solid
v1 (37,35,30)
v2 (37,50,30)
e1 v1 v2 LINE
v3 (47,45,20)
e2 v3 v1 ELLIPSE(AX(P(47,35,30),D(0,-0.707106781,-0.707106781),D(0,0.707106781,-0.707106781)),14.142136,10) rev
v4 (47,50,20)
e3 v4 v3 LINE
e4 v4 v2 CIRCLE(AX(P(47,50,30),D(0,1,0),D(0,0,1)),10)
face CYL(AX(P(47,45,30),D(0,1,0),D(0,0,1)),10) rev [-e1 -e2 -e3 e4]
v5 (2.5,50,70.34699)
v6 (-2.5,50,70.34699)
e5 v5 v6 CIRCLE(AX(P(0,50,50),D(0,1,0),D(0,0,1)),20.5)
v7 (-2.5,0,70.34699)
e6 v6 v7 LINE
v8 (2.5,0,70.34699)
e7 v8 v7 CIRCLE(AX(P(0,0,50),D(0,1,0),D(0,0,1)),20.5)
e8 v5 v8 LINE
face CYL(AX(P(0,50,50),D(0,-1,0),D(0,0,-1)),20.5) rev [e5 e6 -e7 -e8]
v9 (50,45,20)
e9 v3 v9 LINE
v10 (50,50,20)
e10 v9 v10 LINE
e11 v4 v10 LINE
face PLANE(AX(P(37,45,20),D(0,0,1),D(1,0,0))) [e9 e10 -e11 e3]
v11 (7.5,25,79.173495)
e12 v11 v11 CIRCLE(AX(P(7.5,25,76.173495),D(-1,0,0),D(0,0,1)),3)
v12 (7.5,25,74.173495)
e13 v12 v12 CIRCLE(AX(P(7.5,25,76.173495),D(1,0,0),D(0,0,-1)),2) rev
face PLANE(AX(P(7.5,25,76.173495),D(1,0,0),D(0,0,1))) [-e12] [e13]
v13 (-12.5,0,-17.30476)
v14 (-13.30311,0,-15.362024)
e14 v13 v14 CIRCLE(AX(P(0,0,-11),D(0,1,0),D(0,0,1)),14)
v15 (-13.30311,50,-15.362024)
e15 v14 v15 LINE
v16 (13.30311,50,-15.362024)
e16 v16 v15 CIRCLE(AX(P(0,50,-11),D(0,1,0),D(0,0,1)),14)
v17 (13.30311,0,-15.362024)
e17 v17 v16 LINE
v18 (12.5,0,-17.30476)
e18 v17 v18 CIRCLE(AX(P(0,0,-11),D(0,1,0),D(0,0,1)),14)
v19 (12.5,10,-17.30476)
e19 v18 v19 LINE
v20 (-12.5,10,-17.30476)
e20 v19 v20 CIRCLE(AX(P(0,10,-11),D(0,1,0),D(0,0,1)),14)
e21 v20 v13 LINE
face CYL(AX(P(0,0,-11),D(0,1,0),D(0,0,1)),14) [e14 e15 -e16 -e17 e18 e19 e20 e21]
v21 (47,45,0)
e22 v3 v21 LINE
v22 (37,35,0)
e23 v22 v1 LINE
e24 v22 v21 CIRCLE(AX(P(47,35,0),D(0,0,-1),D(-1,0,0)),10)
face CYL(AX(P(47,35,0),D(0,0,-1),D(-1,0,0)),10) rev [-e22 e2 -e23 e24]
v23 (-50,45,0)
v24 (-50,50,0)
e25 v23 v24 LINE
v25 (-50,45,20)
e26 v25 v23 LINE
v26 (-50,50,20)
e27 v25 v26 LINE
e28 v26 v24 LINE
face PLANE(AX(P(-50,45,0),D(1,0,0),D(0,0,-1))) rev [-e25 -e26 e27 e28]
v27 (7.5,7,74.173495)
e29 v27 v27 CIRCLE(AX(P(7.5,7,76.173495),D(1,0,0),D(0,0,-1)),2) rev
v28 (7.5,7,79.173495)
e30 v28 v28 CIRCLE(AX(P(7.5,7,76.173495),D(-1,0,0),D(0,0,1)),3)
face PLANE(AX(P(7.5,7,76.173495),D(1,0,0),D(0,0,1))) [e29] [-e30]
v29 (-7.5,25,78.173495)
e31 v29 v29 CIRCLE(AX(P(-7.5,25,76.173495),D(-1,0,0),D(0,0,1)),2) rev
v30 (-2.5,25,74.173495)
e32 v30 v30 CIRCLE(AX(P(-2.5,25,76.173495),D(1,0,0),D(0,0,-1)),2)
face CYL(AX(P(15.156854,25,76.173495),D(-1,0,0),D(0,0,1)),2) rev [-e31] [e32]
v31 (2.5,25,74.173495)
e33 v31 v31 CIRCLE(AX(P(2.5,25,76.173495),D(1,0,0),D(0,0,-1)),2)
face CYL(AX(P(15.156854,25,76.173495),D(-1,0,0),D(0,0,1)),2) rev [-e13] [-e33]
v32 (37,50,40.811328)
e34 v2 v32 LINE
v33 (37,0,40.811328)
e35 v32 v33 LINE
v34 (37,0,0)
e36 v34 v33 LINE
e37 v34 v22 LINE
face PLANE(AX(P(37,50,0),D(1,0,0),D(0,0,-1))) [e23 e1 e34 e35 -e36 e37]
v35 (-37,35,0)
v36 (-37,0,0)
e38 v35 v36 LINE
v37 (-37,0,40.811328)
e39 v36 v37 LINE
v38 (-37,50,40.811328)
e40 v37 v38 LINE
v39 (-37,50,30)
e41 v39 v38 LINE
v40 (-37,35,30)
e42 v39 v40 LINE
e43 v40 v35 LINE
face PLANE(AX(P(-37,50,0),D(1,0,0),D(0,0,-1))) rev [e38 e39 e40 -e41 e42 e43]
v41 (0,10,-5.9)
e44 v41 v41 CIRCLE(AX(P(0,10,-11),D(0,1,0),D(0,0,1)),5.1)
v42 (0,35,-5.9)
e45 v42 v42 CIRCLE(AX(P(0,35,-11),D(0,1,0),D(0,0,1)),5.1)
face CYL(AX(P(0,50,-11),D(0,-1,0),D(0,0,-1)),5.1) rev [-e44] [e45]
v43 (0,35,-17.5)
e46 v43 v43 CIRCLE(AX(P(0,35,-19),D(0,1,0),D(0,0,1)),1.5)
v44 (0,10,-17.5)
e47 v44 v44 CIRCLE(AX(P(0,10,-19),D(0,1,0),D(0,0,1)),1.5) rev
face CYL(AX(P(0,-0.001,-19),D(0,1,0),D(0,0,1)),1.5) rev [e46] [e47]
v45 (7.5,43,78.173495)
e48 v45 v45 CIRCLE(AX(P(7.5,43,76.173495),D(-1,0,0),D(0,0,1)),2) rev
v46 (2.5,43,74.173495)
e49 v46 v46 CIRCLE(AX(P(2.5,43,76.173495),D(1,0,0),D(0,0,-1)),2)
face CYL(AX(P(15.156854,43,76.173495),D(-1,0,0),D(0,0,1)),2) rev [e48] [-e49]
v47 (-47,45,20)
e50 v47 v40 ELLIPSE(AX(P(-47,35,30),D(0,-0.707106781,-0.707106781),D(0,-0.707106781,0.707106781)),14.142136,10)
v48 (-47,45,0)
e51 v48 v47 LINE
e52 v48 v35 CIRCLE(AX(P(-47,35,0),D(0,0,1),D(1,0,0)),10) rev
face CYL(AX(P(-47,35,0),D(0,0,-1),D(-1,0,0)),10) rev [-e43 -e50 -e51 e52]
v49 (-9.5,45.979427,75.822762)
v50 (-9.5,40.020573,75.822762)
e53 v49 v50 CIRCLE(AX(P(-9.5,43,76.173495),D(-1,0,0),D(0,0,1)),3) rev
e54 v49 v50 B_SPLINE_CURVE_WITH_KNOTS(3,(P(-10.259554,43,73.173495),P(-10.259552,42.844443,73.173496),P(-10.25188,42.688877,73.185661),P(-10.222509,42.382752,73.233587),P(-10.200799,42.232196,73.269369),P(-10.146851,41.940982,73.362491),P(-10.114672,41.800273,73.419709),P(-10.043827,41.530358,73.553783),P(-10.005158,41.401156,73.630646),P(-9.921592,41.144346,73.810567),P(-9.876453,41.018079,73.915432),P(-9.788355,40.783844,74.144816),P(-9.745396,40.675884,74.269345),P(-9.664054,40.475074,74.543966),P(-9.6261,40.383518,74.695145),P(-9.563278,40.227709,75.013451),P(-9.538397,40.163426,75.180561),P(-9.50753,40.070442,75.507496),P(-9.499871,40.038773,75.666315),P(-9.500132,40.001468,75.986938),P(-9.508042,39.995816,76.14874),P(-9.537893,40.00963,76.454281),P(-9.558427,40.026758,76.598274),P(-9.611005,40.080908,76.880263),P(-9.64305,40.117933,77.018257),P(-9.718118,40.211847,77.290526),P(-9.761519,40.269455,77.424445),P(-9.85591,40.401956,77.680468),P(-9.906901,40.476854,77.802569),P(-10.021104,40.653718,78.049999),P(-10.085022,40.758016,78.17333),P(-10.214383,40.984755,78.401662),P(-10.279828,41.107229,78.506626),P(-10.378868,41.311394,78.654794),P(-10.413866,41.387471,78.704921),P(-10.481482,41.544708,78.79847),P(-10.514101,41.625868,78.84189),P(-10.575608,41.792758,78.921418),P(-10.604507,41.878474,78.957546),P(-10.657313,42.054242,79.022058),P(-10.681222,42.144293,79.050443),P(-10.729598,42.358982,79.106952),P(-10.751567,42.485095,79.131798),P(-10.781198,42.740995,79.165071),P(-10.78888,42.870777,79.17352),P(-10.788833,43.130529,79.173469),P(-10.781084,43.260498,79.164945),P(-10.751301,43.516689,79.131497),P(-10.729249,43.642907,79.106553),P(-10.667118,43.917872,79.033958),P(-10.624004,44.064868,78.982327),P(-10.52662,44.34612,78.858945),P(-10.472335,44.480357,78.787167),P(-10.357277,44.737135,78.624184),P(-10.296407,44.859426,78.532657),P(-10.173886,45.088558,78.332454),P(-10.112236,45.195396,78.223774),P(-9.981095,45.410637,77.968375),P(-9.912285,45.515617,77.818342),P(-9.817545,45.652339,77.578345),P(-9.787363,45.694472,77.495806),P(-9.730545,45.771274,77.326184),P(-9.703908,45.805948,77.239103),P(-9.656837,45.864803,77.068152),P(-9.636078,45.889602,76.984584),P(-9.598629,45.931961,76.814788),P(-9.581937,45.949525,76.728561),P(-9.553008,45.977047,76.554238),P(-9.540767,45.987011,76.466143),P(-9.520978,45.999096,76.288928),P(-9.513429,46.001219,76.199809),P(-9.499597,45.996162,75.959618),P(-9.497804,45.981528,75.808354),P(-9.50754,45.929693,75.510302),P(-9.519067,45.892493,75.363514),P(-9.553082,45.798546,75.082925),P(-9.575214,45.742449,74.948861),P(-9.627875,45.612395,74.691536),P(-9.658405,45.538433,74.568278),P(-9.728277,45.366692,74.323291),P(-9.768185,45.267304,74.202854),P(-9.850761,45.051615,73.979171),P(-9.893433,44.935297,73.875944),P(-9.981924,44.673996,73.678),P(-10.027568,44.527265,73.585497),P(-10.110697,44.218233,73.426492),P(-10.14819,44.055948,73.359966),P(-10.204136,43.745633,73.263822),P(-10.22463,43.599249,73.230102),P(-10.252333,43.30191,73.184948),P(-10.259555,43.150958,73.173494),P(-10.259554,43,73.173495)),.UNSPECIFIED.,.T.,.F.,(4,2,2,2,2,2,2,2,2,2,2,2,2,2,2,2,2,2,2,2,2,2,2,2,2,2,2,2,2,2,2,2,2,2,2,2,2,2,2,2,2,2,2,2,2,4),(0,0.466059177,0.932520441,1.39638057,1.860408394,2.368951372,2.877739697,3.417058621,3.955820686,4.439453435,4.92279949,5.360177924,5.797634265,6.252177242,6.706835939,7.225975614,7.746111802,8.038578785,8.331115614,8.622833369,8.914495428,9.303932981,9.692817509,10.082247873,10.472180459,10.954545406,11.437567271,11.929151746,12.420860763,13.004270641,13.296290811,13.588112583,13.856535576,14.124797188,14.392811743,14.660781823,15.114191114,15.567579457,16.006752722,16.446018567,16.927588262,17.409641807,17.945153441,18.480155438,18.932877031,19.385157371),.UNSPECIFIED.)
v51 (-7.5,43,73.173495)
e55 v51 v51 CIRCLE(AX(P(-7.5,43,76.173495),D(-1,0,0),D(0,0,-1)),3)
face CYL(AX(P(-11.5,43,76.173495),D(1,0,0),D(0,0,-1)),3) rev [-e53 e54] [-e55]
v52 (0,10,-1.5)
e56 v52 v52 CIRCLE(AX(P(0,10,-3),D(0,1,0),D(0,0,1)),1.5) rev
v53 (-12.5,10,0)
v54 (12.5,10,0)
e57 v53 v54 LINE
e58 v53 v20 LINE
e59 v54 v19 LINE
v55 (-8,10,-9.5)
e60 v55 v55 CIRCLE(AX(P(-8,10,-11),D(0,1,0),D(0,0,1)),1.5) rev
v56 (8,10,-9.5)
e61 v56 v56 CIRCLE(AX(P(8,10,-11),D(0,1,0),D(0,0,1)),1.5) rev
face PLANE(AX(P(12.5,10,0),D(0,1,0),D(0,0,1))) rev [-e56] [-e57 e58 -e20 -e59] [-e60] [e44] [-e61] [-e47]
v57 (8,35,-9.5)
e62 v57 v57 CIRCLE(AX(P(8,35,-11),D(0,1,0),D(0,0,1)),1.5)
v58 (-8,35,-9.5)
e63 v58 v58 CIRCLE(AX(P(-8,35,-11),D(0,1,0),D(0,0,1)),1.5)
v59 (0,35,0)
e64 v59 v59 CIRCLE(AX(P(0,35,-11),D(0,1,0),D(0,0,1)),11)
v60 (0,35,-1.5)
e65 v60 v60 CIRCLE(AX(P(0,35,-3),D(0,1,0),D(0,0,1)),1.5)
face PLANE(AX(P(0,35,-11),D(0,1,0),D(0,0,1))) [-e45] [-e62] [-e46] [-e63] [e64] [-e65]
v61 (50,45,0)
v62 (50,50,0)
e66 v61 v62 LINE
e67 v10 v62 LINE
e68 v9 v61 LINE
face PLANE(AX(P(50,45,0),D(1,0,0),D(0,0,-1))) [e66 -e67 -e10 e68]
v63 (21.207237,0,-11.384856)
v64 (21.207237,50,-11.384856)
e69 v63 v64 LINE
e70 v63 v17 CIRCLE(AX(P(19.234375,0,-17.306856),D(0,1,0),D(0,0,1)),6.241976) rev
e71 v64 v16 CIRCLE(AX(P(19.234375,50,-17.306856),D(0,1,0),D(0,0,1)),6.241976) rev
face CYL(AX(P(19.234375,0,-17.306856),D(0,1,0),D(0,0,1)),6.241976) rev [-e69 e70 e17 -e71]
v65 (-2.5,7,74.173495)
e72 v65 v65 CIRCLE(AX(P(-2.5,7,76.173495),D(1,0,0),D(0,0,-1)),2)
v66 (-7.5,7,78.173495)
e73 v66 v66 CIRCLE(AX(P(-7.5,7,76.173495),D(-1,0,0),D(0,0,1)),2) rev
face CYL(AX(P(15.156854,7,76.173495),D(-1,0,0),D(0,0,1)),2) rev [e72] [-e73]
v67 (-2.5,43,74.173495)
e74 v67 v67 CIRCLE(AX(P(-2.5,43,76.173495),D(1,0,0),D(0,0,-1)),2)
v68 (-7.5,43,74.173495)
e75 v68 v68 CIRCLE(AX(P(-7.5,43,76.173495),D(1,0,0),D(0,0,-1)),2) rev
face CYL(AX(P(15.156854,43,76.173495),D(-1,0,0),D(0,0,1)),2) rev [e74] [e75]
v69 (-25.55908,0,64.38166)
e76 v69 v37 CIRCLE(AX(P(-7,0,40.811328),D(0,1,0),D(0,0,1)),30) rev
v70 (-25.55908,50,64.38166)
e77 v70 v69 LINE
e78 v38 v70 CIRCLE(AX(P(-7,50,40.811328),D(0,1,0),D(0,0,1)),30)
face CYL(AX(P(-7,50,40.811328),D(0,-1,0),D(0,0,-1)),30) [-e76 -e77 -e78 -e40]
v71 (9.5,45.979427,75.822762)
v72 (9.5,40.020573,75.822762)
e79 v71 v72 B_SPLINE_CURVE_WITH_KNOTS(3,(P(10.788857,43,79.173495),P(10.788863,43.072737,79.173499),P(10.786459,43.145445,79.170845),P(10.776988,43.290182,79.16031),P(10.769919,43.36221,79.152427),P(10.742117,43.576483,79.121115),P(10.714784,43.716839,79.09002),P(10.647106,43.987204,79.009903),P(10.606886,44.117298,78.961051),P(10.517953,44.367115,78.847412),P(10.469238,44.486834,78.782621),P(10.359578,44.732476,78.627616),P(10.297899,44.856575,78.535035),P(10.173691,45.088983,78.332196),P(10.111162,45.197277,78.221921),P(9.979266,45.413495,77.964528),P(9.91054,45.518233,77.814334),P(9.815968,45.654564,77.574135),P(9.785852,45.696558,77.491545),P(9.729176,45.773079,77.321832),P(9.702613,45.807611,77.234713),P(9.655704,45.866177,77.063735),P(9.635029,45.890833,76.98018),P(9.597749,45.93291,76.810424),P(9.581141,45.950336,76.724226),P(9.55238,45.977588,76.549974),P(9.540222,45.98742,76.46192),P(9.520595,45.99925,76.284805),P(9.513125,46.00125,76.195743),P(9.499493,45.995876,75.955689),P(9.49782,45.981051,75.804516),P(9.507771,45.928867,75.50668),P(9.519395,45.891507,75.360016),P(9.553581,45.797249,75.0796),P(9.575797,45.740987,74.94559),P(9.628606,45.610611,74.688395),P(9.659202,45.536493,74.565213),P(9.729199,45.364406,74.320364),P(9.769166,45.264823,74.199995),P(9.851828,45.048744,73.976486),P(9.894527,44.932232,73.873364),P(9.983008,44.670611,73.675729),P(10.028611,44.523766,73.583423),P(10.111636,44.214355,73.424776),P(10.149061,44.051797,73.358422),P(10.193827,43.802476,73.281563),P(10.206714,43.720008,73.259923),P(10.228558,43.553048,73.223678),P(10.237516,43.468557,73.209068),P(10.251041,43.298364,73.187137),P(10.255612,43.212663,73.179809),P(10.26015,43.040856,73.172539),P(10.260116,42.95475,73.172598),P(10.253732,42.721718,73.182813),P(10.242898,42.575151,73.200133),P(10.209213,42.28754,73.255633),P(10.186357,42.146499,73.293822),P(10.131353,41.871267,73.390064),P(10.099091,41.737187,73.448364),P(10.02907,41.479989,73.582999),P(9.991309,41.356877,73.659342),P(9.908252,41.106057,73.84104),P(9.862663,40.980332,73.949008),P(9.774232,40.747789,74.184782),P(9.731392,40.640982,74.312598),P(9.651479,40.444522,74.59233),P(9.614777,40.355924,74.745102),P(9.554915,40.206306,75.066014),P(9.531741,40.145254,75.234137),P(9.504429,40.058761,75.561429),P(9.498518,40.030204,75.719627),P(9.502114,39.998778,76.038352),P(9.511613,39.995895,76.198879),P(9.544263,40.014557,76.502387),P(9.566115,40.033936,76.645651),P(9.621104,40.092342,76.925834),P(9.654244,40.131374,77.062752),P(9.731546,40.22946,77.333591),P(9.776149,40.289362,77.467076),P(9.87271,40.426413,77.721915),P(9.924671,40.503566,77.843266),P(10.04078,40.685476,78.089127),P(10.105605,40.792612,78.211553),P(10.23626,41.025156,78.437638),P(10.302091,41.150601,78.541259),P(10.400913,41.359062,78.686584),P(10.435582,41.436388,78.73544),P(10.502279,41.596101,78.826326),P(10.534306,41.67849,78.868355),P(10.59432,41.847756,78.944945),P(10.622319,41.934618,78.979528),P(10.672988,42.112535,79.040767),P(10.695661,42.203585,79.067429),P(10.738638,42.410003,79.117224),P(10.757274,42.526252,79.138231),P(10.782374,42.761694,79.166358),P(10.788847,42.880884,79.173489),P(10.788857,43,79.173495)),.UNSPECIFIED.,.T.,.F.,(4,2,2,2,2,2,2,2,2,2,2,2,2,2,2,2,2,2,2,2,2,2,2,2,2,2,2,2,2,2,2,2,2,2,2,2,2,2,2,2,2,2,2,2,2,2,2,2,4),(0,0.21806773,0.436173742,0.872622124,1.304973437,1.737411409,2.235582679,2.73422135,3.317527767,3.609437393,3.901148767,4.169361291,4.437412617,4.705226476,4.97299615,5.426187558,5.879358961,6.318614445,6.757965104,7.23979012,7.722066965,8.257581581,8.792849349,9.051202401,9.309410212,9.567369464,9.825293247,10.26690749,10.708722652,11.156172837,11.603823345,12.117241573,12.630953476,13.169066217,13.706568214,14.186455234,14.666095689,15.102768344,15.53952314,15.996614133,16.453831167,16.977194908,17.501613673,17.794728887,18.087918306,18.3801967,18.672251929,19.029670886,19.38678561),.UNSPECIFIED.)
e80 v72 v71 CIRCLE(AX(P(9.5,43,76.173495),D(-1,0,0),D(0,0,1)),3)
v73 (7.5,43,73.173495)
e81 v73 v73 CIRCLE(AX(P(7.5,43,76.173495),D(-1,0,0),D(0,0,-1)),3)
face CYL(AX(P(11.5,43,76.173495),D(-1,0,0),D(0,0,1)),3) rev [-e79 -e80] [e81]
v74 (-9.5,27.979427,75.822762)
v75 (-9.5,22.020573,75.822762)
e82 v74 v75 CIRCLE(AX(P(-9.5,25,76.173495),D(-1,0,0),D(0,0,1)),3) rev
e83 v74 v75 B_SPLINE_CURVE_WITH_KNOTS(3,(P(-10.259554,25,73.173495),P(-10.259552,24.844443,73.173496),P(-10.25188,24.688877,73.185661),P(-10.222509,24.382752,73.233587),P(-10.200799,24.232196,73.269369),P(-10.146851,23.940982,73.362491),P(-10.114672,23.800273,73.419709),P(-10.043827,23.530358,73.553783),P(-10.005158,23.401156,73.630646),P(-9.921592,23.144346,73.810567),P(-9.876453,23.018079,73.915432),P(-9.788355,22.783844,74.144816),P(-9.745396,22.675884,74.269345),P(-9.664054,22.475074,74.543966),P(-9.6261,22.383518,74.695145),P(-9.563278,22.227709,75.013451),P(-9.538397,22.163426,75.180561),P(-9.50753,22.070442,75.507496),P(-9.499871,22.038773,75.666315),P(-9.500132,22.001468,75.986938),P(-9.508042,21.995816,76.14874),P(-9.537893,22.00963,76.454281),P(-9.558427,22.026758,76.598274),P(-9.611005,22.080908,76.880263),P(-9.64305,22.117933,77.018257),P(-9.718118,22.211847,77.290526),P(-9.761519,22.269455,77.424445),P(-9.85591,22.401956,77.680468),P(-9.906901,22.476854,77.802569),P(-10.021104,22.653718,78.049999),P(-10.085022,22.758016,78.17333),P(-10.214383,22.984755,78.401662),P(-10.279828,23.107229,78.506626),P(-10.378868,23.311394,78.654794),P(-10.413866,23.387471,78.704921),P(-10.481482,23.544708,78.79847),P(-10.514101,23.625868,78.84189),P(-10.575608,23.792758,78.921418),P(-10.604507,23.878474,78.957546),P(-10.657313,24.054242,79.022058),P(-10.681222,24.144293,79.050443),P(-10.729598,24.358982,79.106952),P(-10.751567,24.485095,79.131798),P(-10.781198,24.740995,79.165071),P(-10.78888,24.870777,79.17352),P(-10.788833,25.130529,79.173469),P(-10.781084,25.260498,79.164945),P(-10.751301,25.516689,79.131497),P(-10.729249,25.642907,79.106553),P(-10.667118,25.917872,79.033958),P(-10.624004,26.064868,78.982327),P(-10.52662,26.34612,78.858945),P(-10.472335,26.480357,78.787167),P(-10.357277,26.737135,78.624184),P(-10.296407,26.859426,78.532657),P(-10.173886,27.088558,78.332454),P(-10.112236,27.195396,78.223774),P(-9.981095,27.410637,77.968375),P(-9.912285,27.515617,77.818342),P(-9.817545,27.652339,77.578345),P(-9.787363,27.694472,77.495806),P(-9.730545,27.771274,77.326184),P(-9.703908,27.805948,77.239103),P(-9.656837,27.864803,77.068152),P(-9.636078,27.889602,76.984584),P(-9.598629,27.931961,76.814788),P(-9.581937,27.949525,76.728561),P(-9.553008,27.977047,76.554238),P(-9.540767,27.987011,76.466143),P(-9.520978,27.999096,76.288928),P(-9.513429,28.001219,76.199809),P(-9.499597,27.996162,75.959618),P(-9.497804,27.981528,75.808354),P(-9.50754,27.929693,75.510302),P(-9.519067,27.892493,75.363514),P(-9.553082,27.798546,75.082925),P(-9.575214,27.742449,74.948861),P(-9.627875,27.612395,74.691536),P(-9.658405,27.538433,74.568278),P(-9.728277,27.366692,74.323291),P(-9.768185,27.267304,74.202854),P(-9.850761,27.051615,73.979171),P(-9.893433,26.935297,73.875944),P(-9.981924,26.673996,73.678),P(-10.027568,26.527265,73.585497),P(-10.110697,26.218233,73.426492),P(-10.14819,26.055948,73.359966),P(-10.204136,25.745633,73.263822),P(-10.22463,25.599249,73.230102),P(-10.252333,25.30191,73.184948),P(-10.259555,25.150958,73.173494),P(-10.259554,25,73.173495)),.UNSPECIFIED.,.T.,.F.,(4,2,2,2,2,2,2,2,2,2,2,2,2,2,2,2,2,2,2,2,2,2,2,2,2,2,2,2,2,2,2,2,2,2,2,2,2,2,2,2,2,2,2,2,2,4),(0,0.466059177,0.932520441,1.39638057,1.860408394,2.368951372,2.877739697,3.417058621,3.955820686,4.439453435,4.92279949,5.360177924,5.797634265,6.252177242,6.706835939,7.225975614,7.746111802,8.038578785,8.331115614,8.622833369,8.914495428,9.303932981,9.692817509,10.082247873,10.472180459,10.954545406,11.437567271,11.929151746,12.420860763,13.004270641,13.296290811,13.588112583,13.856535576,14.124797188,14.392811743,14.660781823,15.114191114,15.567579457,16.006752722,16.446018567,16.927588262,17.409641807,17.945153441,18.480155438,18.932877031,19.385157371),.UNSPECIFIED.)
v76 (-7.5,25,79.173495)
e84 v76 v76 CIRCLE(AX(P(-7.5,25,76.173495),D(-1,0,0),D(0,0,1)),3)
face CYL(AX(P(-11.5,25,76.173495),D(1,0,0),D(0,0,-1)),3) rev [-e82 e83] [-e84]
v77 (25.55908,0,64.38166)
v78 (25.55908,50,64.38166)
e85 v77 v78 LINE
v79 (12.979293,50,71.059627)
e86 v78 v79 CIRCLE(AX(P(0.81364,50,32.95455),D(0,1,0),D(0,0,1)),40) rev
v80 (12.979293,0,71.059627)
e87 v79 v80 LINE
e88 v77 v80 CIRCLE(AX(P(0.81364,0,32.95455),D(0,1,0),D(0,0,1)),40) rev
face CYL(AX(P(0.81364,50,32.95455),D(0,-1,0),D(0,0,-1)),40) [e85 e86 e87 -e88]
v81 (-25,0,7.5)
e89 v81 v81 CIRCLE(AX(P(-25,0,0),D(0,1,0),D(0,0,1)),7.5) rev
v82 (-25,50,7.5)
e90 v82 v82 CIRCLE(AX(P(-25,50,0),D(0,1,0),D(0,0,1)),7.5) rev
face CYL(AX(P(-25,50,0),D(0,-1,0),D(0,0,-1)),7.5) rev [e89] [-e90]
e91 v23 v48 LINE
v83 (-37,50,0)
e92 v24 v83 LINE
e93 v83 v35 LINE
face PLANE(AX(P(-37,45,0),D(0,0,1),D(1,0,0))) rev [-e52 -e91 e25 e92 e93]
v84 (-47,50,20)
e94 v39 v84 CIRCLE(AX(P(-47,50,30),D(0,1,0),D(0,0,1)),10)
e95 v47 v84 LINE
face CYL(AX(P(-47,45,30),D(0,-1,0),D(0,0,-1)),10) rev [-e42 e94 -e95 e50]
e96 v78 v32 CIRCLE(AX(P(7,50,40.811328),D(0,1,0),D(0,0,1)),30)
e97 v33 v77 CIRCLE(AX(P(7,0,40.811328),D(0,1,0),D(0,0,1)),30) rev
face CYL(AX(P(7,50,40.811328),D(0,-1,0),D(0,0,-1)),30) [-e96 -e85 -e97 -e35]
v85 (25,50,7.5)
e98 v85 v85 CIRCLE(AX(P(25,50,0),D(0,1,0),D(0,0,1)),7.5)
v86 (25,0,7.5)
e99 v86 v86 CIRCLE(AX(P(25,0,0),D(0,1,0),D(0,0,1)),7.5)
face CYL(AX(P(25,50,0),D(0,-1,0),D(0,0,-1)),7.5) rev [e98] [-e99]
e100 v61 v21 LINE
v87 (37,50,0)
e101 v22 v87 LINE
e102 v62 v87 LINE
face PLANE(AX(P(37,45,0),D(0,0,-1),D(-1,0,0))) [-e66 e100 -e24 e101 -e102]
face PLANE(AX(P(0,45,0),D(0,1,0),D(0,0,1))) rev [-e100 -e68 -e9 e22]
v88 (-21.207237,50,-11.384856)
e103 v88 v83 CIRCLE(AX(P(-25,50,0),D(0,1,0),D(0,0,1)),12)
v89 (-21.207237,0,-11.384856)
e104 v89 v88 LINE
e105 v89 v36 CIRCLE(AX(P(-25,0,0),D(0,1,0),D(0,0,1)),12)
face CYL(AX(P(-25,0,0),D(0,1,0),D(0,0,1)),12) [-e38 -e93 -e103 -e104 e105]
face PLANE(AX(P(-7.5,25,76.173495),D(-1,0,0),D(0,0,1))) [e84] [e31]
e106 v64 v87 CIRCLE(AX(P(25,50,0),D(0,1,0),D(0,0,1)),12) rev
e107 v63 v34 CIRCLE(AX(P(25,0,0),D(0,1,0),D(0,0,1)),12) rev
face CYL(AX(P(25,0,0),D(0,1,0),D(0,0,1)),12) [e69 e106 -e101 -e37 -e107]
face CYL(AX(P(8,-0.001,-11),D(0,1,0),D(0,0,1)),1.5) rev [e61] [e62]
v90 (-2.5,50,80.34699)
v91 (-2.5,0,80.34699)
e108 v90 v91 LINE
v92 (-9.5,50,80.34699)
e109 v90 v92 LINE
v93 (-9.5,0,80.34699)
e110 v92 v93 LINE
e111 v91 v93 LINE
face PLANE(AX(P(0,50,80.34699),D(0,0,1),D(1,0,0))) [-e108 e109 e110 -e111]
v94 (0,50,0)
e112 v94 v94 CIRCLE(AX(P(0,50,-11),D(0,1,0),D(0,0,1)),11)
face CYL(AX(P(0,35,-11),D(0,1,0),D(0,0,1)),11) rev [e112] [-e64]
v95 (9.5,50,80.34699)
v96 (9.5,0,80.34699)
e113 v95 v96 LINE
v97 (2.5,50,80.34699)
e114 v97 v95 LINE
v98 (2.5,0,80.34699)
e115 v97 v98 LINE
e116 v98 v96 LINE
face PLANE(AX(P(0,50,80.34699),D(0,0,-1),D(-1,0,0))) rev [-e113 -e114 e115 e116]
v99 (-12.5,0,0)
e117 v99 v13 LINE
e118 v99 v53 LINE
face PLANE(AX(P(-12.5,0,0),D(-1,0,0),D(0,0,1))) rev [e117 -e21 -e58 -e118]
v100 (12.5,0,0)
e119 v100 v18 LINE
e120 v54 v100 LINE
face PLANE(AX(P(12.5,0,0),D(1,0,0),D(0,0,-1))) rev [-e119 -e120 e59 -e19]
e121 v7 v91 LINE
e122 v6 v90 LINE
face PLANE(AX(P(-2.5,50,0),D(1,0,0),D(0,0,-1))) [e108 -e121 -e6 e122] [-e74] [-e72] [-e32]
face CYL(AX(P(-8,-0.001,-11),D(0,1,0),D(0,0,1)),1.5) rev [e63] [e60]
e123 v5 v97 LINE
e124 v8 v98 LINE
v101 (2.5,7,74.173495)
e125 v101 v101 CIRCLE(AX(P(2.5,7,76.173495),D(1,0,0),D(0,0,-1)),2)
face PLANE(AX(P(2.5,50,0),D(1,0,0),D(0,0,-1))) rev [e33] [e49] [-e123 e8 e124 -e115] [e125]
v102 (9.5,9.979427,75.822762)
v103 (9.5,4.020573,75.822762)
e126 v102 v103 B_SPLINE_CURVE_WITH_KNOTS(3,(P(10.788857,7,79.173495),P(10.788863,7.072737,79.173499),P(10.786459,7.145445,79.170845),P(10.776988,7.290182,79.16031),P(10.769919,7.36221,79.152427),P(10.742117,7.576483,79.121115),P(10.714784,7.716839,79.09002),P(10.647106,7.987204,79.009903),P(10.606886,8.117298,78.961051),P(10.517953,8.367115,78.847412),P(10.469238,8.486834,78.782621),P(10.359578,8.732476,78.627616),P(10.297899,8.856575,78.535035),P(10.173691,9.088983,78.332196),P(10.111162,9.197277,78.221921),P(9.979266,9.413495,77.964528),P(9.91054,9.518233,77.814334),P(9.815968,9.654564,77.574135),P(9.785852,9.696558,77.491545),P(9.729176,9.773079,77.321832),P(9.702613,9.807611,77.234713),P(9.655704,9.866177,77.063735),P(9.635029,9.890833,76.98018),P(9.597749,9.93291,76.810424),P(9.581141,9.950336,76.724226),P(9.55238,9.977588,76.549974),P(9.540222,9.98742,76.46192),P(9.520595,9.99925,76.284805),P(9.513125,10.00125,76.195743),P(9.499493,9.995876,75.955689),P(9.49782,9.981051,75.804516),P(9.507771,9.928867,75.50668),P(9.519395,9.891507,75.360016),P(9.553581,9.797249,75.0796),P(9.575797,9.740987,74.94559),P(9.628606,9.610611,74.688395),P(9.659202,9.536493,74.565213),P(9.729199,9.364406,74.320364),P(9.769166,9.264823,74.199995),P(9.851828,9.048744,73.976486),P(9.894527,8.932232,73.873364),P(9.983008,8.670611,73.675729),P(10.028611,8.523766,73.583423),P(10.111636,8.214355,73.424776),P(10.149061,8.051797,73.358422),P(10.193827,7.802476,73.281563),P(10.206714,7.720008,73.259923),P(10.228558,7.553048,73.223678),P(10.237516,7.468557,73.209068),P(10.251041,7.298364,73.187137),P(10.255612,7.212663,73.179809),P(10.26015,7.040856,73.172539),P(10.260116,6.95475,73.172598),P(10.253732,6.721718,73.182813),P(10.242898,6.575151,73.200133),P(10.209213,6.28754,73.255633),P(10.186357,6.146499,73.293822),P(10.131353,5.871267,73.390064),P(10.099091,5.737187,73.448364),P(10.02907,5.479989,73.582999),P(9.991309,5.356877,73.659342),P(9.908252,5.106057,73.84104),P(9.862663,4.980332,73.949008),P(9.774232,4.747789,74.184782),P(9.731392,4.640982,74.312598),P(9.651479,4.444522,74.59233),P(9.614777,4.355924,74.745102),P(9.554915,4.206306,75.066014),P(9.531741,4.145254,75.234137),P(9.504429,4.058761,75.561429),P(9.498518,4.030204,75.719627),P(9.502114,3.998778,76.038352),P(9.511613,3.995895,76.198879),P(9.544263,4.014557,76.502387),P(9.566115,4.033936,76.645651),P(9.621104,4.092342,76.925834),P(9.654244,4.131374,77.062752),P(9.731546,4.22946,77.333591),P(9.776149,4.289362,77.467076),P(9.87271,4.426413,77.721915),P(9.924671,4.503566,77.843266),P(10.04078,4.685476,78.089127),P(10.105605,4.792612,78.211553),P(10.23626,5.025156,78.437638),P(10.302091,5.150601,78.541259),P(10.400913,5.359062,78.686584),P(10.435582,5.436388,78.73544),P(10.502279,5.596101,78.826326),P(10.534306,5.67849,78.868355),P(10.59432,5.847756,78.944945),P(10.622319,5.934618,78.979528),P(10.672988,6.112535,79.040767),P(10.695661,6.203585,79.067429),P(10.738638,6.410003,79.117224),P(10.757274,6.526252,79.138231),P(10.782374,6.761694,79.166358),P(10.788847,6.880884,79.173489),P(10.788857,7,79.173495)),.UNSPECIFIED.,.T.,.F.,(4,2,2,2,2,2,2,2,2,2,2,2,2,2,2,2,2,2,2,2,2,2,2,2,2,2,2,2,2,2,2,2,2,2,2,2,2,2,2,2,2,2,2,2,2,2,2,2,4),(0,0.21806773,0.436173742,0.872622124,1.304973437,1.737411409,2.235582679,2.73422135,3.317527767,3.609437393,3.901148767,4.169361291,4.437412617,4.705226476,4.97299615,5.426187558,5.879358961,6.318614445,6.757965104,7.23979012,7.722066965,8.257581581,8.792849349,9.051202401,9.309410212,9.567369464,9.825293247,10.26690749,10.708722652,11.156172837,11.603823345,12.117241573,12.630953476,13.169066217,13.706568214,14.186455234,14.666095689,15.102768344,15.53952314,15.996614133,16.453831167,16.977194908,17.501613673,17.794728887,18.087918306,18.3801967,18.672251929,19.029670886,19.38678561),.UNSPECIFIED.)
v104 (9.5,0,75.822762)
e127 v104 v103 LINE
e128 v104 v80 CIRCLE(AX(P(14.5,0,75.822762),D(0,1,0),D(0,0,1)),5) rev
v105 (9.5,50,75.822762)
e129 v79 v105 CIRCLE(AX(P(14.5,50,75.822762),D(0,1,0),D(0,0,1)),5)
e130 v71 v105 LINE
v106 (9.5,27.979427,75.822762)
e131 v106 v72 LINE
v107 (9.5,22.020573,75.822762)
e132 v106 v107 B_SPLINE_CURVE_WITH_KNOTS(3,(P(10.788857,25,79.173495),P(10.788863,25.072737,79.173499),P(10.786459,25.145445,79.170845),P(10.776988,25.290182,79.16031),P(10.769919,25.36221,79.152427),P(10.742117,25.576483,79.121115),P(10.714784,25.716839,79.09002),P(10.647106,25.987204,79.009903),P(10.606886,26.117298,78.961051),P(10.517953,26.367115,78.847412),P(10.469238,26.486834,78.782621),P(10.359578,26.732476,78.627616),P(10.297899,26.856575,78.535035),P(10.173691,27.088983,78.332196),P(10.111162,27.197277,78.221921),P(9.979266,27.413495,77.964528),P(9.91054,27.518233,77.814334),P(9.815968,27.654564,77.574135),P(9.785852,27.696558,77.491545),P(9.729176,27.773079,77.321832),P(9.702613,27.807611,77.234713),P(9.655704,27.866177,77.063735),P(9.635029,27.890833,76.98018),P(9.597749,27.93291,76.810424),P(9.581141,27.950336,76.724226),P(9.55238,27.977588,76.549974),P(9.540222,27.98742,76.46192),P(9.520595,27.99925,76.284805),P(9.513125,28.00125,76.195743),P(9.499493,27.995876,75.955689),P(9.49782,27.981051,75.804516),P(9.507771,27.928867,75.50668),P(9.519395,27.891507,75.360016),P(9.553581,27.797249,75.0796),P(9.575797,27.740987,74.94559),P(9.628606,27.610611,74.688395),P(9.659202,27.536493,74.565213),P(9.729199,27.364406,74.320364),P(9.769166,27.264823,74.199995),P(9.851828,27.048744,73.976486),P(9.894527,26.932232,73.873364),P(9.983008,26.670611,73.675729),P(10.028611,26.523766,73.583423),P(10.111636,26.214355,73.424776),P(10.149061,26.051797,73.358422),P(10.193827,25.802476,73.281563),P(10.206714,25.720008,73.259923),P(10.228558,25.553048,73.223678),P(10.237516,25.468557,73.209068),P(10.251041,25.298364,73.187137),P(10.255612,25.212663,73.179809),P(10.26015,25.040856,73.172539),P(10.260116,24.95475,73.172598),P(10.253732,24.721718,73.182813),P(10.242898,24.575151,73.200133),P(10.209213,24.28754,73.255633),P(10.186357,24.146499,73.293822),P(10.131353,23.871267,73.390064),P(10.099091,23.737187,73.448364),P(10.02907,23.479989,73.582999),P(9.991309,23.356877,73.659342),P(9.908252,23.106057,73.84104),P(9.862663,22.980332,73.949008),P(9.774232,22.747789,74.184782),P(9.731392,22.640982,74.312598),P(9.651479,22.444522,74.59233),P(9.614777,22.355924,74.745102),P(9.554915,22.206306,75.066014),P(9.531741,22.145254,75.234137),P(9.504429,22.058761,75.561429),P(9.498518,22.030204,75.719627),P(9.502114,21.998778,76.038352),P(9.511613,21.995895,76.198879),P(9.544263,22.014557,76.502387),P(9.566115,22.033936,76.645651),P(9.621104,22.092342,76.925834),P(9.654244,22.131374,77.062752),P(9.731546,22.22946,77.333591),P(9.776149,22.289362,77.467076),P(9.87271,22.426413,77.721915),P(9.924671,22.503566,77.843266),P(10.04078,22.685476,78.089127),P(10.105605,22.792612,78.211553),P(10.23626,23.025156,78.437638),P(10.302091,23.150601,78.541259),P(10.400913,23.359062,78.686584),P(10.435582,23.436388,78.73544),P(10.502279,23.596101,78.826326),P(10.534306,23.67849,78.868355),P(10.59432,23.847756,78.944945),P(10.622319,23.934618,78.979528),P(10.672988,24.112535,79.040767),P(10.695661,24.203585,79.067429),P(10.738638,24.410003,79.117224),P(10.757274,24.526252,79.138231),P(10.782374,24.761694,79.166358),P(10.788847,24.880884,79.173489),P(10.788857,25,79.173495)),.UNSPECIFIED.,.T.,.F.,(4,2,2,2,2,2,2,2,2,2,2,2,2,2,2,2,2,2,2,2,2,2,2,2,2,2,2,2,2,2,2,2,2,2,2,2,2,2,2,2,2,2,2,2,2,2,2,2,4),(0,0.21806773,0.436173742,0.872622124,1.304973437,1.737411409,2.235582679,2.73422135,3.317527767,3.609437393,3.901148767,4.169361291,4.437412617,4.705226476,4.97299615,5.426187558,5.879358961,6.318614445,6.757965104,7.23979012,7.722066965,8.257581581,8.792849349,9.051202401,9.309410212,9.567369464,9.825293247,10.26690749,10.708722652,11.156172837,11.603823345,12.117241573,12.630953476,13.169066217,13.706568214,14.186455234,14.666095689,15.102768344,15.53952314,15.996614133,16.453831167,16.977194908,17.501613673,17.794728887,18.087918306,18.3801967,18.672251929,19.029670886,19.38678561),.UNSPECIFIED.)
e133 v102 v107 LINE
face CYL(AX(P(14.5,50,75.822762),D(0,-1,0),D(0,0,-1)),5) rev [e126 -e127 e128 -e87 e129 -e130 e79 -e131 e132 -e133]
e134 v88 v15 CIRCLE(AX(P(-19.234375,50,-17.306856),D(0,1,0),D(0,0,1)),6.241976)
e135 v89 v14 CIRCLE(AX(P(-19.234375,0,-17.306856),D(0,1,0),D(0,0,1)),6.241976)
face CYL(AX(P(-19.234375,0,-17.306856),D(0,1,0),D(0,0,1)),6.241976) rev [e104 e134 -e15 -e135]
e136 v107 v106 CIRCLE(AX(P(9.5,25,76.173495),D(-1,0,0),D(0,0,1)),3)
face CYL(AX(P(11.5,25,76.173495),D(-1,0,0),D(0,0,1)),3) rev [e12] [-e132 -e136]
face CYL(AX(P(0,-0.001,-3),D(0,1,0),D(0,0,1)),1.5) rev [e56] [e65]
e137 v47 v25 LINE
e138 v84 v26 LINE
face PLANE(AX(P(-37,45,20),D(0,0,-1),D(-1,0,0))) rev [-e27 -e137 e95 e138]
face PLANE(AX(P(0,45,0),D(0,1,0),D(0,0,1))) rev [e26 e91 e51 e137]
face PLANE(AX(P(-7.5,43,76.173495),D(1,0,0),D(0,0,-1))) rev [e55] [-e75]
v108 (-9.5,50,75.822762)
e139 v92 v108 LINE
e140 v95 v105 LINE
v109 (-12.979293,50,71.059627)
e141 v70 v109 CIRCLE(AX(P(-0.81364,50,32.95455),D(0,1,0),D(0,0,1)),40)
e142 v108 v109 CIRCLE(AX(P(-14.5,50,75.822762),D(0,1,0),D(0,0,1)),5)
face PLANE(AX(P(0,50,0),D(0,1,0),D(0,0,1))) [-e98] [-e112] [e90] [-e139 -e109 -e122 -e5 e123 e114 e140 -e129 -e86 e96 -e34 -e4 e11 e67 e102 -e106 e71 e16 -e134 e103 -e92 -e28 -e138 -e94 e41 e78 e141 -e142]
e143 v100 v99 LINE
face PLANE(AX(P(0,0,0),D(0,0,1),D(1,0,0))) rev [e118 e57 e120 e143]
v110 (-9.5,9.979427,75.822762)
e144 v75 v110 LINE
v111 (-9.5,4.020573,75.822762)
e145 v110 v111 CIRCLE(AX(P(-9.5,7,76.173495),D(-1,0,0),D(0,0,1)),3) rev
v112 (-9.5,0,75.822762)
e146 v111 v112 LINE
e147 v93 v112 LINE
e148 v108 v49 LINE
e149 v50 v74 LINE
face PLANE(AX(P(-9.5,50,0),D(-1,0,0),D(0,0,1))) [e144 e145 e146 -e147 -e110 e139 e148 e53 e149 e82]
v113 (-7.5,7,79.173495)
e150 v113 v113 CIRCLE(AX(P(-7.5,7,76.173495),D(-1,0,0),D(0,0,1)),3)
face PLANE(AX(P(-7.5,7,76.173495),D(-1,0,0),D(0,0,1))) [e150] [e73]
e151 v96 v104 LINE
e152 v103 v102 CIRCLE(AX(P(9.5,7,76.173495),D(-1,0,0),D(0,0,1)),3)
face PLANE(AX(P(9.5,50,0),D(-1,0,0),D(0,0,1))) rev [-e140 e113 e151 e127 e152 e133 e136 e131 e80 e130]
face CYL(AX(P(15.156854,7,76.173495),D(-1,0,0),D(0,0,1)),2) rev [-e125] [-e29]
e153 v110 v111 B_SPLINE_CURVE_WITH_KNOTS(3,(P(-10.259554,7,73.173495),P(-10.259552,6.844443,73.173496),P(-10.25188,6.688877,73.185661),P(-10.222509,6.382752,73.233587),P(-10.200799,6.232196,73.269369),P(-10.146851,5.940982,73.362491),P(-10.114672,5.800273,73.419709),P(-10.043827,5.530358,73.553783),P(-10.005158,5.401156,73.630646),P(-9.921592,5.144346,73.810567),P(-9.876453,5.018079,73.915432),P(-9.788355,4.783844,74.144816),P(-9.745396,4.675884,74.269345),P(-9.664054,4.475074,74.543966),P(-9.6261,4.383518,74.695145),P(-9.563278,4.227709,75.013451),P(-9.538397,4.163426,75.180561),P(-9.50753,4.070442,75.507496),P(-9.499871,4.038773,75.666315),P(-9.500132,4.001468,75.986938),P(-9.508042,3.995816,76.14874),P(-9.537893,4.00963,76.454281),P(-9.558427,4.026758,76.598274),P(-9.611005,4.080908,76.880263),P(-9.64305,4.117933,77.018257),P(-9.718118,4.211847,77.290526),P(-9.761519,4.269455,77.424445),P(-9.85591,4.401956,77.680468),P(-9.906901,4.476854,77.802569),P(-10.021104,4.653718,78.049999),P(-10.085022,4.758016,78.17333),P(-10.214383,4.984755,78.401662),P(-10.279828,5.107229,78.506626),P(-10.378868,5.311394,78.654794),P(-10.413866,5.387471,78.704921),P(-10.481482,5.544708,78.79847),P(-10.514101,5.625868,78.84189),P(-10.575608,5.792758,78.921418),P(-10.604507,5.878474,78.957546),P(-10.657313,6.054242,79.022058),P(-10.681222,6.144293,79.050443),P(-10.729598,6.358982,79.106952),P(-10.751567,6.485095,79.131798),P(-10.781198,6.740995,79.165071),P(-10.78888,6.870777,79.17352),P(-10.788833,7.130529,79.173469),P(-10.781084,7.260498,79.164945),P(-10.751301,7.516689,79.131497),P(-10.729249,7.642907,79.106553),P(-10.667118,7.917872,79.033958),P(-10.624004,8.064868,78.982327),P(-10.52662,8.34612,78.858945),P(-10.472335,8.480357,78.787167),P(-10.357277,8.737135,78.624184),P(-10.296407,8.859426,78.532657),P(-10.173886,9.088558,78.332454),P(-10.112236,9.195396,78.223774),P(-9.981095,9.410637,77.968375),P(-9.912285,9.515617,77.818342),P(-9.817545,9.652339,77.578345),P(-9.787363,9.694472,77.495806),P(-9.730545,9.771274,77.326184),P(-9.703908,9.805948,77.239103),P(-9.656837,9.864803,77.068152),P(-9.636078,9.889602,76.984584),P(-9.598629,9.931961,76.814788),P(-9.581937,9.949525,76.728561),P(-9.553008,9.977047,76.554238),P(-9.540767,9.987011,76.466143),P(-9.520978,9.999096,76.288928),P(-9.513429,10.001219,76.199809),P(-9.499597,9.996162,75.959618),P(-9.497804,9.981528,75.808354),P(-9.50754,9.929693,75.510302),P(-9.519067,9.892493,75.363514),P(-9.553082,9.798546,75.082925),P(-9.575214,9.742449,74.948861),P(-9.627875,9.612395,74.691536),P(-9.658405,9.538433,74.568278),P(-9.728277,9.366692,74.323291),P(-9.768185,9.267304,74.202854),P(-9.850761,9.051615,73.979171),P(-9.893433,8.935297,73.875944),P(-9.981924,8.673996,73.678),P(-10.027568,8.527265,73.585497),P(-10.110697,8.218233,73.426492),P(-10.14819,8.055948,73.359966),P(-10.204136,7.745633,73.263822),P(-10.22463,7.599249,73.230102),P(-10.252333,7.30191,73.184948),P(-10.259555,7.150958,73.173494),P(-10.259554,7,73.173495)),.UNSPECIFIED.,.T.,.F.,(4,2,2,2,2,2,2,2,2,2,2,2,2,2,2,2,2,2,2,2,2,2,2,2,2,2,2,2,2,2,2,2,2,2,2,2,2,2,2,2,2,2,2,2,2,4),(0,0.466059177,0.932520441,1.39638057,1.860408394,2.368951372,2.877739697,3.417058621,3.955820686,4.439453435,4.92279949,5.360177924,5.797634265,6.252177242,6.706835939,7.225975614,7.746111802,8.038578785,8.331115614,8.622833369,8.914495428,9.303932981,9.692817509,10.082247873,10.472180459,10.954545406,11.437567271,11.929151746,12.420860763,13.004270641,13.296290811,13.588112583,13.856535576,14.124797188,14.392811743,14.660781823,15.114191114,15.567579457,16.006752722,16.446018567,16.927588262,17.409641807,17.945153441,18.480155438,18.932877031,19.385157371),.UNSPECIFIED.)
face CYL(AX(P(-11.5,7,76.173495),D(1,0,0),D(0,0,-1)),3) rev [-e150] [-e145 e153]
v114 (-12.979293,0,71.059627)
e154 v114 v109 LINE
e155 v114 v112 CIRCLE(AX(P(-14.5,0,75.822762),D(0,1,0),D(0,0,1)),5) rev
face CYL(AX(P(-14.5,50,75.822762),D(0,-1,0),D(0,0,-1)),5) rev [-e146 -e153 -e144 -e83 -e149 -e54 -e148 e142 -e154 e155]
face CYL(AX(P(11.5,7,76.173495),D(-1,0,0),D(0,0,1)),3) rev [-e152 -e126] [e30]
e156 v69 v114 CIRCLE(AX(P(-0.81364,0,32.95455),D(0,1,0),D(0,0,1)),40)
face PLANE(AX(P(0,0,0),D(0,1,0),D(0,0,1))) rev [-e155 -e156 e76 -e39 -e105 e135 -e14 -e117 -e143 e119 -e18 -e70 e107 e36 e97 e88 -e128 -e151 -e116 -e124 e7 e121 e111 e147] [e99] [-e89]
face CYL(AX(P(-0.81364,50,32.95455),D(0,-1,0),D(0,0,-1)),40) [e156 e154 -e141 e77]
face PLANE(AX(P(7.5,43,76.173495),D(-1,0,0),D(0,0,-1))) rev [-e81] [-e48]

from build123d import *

# Parameters (mm, degrees)
SKETCH1_R           = 7.5
SKETCH1_R_2         = 5.1
BOSS_EXTRUDE1_DEPTH = 50
SKETCH4_R           = 11
CUT_EXTRUDE1_DEPTH  = 15
CUT_EXTRUDE2_REACH  = 97.13
SKETCH5_R           = 1.5
SKETCH7_W           = 25
SKETCH7_H           = 10
CUT_EXTRUDE3_DEPTH  = 25
FILLET1_R           = 25
FILLET2_R           = 25
CUT_EXTRUDE4_REACH  = 107.441
SKETCH9_R           = 2
FILLET3_R           = 5
FILLET4_R           = 5
SKETCH10_R          = 3
CUT_EXTRUDE5_DEPTH  = 2
CUT_EXTRUDE6_DEPTH  = 102.610229819
FILLET5_R           = 30
FILLET6_R           = 30
SKETCH13_W          = 13
SKETCH13_H          = 20
BOSS_EXTRUDE2_DEPTH = 5
FILLET7_R           = 10
FILLET13_R          = 10


with BuildPart() as part:
    # Sketch1 → Boss-Extrude1 (new body)
    with BuildSketch(Plane(origin=(0, 0, 0), x_dir=(1, 0, 0), z_dir=(0, 1, 0))):
        with BuildLine():
            Line((2.5, -70.346989949), (2.5, -80.346989949))
            Line((2.5, -80.346989949), (9.5, -80.346989949))
            Line((9.5, -80.346989949), (9.5, -72))
            ThreePointArc((9.5, -72), (25.801442039, -64.189302549), (37, -50))
            Line((37, -50), (37, 25))
            Line((37, 25), (-37, 25))
            Line((-37, 25), (-37, -50))
            ThreePointArc((-37, -50), (-25.801442039, -64.189302549), (-9.5, -72))
            Line((-9.5, -72), (-9.5, -80.346989949))
            Line((-9.5, -80.346989949), (-2.5, -80.346989949))
            Line((-2.5, -80.346989949), (-2.5, -70.346989949))
            ThreePointArc((-2.5, -70.346989949), (0, -29.5), (2.5, -70.346989949))
        make_face()
        with Locations(Location((25, 0, 0), (0, 0, 270))):
            Circle(SKETCH1_R, mode=Mode.SUBTRACT)
        with Locations(Location((-25, 0, 0), (0, 0, 270))):
            Circle(SKETCH1_R, mode=Mode.SUBTRACT)
        with Locations(Location((0, 11, 0), (0, 0, 270))):
            Circle(SKETCH1_R_2, mode=Mode.SUBTRACT)
    extrude(amount=BOSS_EXTRUDE1_DEPTH)

    # Sketch4 → Cut-Extrude1 (cut)
    with BuildSketch(Plane(origin=(0, 50, 0), x_dir=(1, 0, 0), z_dir=(0, 1, 0))):
        with Locations(Location((0, 11, 0), (0, 0, 270))):
            Circle(SKETCH4_R)
    extrude(amount=-CUT_EXTRUDE1_DEPTH, mode=Mode.SUBTRACT)

    # Sketch5 → Cut-Extrude2 (cut, up to next)
    with BuildSketch(Plane(origin=(0, 35, 0), x_dir=(1, 0, 0), z_dir=(0, 1, 0)), mode=Mode.PRIVATE) as cut_extrude2_sk1:
        with Locations(Location((0, 19, 0), (0, 0, 270))):
            Circle(SKETCH5_R)
    cut_extrude2_tool1 = extrude(cut_extrude2_sk1.sketch, amount=-CUT_EXTRUDE2_REACH, mode=Mode.PRIVATE) & part.part
    # Sketch5 → Cut-Extrude2 (cut, up to next)
    with BuildSketch(Plane(origin=(0, 35, 0), x_dir=(1, 0, 0), z_dir=(0, 1, 0)), mode=Mode.PRIVATE) as cut_extrude2_sk2:
        with Locations(Location((8, 11, 0), (0, 0, 270))):
            Circle(SKETCH5_R)
    cut_extrude2_tool2 = extrude(cut_extrude2_sk2.sketch, amount=-CUT_EXTRUDE2_REACH, mode=Mode.PRIVATE) & part.part
    # Sketch5 → Cut-Extrude2 (cut, up to next)
    with BuildSketch(Plane(origin=(0, 35, 0), x_dir=(1, 0, 0), z_dir=(0, 1, 0)), mode=Mode.PRIVATE) as cut_extrude2_sk3:
        with Locations(Location((0, 3, 0), (0, 0, 270))):
            Circle(SKETCH5_R)
    cut_extrude2_tool3 = extrude(cut_extrude2_sk3.sketch, amount=-CUT_EXTRUDE2_REACH, mode=Mode.PRIVATE) & part.part
    # Sketch5 → Cut-Extrude2 (cut, up to next)
    with BuildSketch(Plane(origin=(0, 35, 0), x_dir=(1, 0, 0), z_dir=(0, 1, 0)), mode=Mode.PRIVATE) as cut_extrude2_sk4:
        with Locations(Location((-8, 11, 0), (0, 0, 270))):
            Circle(SKETCH5_R)
    cut_extrude2_tool4 = extrude(cut_extrude2_sk4.sketch, amount=-CUT_EXTRUDE2_REACH, mode=Mode.PRIVATE) & part.part
    add(cut_extrude2_tool1.solids().sort_by_distance((0, 35, -19))[0], mode=Mode.SUBTRACT)
    add(cut_extrude2_tool2.solids().sort_by_distance((8, 35, -11))[0], mode=Mode.SUBTRACT)
    add(cut_extrude2_tool3.solids().sort_by_distance((0, 35, -3))[0], mode=Mode.SUBTRACT)
    add(cut_extrude2_tool4.solids().sort_by_distance((-8, 35, -11))[0], mode=Mode.SUBTRACT)

    # Sketch7 → Cut-Extrude3 (cut)
    with BuildSketch(Plane(origin=(0, 0, -25), x_dir=(-1, 0, 0), z_dir=(0, 0, -1))):
        with Locations((0, 5)):
            Rectangle(SKETCH7_W, SKETCH7_H)
    extrude(amount=-CUT_EXTRUDE3_DEPTH, mode=Mode.SUBTRACT)

    # Fillet1
    fillet1_edges = [part.edges().sort_by_distance(p)[0] for p in [
        (37, 25, -25),
    ]]
    fillet(fillet1_edges, radius=FILLET1_R)

    # Fillet2
    fillet2_edges = [part.edges().sort_by_distance(p)[0] for p in [
        (-37, 25, -25),
    ]]
    fillet(fillet2_edges, radius=FILLET2_R)

    # Cut-Extrude4: up to this face of the body (flat: up to its plane)
    cut_extrude4_end = Plane(part.part.faces().sort_by_distance((9.5, 25, 76.173494975))[0])
    # Sketch9 → Cut-Extrude4 (cut, up to the picked face)
    with BuildSketch(Plane.ZY.offset(9.5), mode=Mode.PRIVATE) as cut_extrude4_sk1:
        with Locations((76.173494975, 43)):
            Circle(SKETCH9_R)
    cut_extrude4_tool1 = split(extrude(cut_extrude4_sk1.sketch, amount=-CUT_EXTRUDE4_REACH, mode=Mode.PRIVATE), bisect_by=cut_extrude4_end, keep=Keep.BOTH, mode=Mode.PRIVATE)
    # Sketch9 → Cut-Extrude4 (cut, up to the picked face)
    with BuildSketch(Plane.ZY.offset(9.5), mode=Mode.PRIVATE) as cut_extrude4_sk2:
        with Locations((76.173494975, 7)):
            Circle(SKETCH9_R)
    cut_extrude4_tool2 = split(extrude(cut_extrude4_sk2.sketch, amount=-CUT_EXTRUDE4_REACH, mode=Mode.PRIVATE), bisect_by=cut_extrude4_end, keep=Keep.BOTH, mode=Mode.PRIVATE)
    # Sketch9 → Cut-Extrude4 (cut, up to the picked face)
    with BuildSketch(Plane.ZY.offset(9.5), mode=Mode.PRIVATE) as cut_extrude4_sk3:
        with Locations((76.173494975, 25)):
            Circle(SKETCH9_R)
    cut_extrude4_tool3 = split(extrude(cut_extrude4_sk3.sketch, amount=-CUT_EXTRUDE4_REACH, mode=Mode.PRIVATE), bisect_by=cut_extrude4_end, keep=Keep.BOTH, mode=Mode.PRIVATE)
    add(cut_extrude4_tool1.solids().sort_by(Axis((-9.5, 43, 76.173495), (1, 0, 0)))[0], mode=Mode.SUBTRACT)
    add(cut_extrude4_tool2.solids().sort_by(Axis((-9.5, 7, 76.173495), (1, 0, 0)))[0], mode=Mode.SUBTRACT)
    add(cut_extrude4_tool3.solids().sort_by(Axis((-9.5, 25, 76.173495), (1, 0, 0)))[0], mode=Mode.SUBTRACT)

    # Fillet3
    # the kernel refuses this fillet: 5 mm, written as the material it adds along each edge
    with BuildSketch(Plane(origin=(-9.5, 0, 72), x_dir=(-0.9653617561408162, 0, -0.2609150815509128), z_dir=(0, 1, 0))) as fillet3_piece_1_section:
        with BuildLine():
            CenterArc((3.829392618, 4.994923289), FILLET3_R, 195.124366766, 72.293488253)
            Line((-0.997416163, 3.690347881), (0, 0))
            ThreePointArc((0, 0), (1.802067114, 0.040613692), (3.604134229, 0))
        make_face()
    fillet3_piece_1 = extrude(amount=50, mode=Mode.PRIVATE)
    fillet3_piece_1 = fillet3_piece_1 - Plane(origin=(-10.278685319, 43, 76.173494975), x_dir=(0, 0, 1), z_dir=(-1, 0, 0)) * Cylinder(2, 115, mode=Mode.PRIVATE)
    fillet3_piece_1 = fillet3_piece_1 - Plane(origin=(-10.278685319, 25, 76.173494975), x_dir=(0, 0, 1), z_dir=(-1, 0, 0)) * Cylinder(2, 115, mode=Mode.PRIVATE)
    fillet3_piece_1 = fillet3_piece_1 - Plane(origin=(-10.278685319, 7, 76.173494975), x_dir=(0, 0, 1), z_dir=(-1, 0, 0)) * Cylinder(2, 115, mode=Mode.PRIVATE)
    add(fillet3_piece_1)

    # Fillet4
    # the kernel refuses this fillet: 5 mm, written as the material it adds along each edge
    with BuildSketch(Plane(origin=(9.5, 0, 72), x_dir=(0.9653617561408171, 0, -0.2609150815509095), z_dir=(0, 1, 0))) as fillet4_piece_1_section:
        with BuildLine():
            CenterArc((3.829392618, -4.994923289), FILLET4_R, 92.582144981, 72.293488253)
            Line((-0.997416163, -3.690347881), (0, 0))
            ThreePointArc((0, 0), (1.802067114, -0.040613692), (3.604134229, 0))
        make_face()
    fillet4_piece_1 = extrude(amount=50, mode=Mode.PRIVATE)
    fillet4_piece_1 = fillet4_piece_1 - Plane(origin=(10.278685319, 43, 76.173494975), x_dir=(0, 0, 1), z_dir=(-1, 0, 0)) * Cylinder(2, 115, mode=Mode.PRIVATE)
    fillet4_piece_1 = fillet4_piece_1 - Plane(origin=(10.278685319, 25, 76.173494975), x_dir=(0, 0, 1), z_dir=(-1, 0, 0)) * Cylinder(2, 115, mode=Mode.PRIVATE)
    fillet4_piece_1 = fillet4_piece_1 - Plane(origin=(10.278685319, 7, 76.173494975), x_dir=(0, 0, 1), z_dir=(-1, 0, 0)) * Cylinder(2, 115, mode=Mode.PRIVATE)
    add(fillet4_piece_1)

    # Sketch10 → Cut-Extrude5 (cut, symmetric)
    with BuildSketch(Plane.ZY.offset(9.5)):
        with Locations(Location((76.173494975, 7, 0), (0, 0, 96.713867574))):
            Circle(SKETCH10_R)
        with Locations(Location((76.173494975, 43, 0), (0, 0, 180))):
            Circle(SKETCH10_R)
        with Locations(Location((76.173494975, 25, 0), (0, 0, 96.713867574))):
            Circle(SKETCH10_R)
    cut_extrude5 = extrude(amount=CUT_EXTRUDE5_DEPTH, both=True, mode=Mode.SUBTRACT)

    # Mirror1: Cut-Extrude5 across plane
    add(cut_extrude5.mirror(Plane(origin=(0, 0, 0), x_dir=(0, 0, 1), z_dir=(1, 0, 0))), mode=Mode.SUBTRACT)

    # Sketch11 → Cut-Extrude6 (cut, through all)
    with BuildSketch(Plane(origin=(0, 50, 0), x_dir=(1, 0, 0), z_dir=(0, 1, 0))):
        with BuildLine():
            ThreePointArc((37, 0), (29.67766953, 17.67766953), (12, 25))
            Line((12, 25), (0, 25))
            ThreePointArc((0, 25), (8.213758719, 22.337291022), (13.303110425, 15.362023959))
            ThreePointArc((13.303110425, 15.362023959), (16.428719044, 11.73096472), (21.207236508, 11.384855954))
            ThreePointArc((21.207236508, 11.384855954), (32.017365535, 9.734299202), (37, 0))
        make_face()
        with BuildLine():
            ThreePointArc((-13.303110425, 15.362023959), (-8.213758719, 22.337291022), (0, 25))
            Line((0, 25), (-12, 25))
            ThreePointArc((-12, 25), (-29.67766953, 17.67766953), (-37, 0))
            ThreePointArc((-37, 0), (-32.017365535, 9.734299202), (-21.207236508, 11.384855954))
            ThreePointArc((-21.207236508, 11.384855954), (-16.428719044, 11.73096472), (-13.303110425, 15.362023959))
        make_face()
    extrude(amount=-CUT_EXTRUDE6_DEPTH, mode=Mode.SUBTRACT)

    # Fillet5
    fillet5_edges = [part.edges().sort_by_distance(p)[0] for p in [
        (-37, 25, 50),
    ]]
    fillet(fillet5_edges, radius=FILLET5_R)

    # Fillet6
    fillet6_edges = [part.edges().sort_by_distance(p)[0] for p in [
        (37, 25, 50),
    ]]
    fillet(fillet6_edges, radius=FILLET6_R)

    # Sketch13 → Boss-Extrude2 (add)
    with BuildSketch(Plane(origin=(0, 50, 0), x_dir=(1, 0, 0), z_dir=(0, 1, 0))):
        with Locations((43.5, -10)):
            Rectangle(SKETCH13_W, SKETCH13_H)
    boss_extrude2 = extrude(amount=-BOSS_EXTRUDE2_DEPTH)

    # Mirror2: Boss-Extrude2 across plane
    add(boss_extrude2.mirror(Plane(origin=(0, 0, 0), x_dir=(0, 0, 1), z_dir=(1, 0, 0))))

    # Fillet7
    fillet7_edges = [part.edges().sort_by_distance(p)[0] for p in [
        (37, 45, 10),
        (37, 47.5, 20),
    ]]
    fillet(fillet7_edges, radius=FILLET7_R)

    # Fillet13
    fillet13_edges = [part.edges().sort_by_distance(p)[0] for p in [
        (-37, 47.5, 20),
        (-37, 45, 10),
    ]]
    fillet(fillet13_edges, radius=FILLET13_R)


solid = part.part
